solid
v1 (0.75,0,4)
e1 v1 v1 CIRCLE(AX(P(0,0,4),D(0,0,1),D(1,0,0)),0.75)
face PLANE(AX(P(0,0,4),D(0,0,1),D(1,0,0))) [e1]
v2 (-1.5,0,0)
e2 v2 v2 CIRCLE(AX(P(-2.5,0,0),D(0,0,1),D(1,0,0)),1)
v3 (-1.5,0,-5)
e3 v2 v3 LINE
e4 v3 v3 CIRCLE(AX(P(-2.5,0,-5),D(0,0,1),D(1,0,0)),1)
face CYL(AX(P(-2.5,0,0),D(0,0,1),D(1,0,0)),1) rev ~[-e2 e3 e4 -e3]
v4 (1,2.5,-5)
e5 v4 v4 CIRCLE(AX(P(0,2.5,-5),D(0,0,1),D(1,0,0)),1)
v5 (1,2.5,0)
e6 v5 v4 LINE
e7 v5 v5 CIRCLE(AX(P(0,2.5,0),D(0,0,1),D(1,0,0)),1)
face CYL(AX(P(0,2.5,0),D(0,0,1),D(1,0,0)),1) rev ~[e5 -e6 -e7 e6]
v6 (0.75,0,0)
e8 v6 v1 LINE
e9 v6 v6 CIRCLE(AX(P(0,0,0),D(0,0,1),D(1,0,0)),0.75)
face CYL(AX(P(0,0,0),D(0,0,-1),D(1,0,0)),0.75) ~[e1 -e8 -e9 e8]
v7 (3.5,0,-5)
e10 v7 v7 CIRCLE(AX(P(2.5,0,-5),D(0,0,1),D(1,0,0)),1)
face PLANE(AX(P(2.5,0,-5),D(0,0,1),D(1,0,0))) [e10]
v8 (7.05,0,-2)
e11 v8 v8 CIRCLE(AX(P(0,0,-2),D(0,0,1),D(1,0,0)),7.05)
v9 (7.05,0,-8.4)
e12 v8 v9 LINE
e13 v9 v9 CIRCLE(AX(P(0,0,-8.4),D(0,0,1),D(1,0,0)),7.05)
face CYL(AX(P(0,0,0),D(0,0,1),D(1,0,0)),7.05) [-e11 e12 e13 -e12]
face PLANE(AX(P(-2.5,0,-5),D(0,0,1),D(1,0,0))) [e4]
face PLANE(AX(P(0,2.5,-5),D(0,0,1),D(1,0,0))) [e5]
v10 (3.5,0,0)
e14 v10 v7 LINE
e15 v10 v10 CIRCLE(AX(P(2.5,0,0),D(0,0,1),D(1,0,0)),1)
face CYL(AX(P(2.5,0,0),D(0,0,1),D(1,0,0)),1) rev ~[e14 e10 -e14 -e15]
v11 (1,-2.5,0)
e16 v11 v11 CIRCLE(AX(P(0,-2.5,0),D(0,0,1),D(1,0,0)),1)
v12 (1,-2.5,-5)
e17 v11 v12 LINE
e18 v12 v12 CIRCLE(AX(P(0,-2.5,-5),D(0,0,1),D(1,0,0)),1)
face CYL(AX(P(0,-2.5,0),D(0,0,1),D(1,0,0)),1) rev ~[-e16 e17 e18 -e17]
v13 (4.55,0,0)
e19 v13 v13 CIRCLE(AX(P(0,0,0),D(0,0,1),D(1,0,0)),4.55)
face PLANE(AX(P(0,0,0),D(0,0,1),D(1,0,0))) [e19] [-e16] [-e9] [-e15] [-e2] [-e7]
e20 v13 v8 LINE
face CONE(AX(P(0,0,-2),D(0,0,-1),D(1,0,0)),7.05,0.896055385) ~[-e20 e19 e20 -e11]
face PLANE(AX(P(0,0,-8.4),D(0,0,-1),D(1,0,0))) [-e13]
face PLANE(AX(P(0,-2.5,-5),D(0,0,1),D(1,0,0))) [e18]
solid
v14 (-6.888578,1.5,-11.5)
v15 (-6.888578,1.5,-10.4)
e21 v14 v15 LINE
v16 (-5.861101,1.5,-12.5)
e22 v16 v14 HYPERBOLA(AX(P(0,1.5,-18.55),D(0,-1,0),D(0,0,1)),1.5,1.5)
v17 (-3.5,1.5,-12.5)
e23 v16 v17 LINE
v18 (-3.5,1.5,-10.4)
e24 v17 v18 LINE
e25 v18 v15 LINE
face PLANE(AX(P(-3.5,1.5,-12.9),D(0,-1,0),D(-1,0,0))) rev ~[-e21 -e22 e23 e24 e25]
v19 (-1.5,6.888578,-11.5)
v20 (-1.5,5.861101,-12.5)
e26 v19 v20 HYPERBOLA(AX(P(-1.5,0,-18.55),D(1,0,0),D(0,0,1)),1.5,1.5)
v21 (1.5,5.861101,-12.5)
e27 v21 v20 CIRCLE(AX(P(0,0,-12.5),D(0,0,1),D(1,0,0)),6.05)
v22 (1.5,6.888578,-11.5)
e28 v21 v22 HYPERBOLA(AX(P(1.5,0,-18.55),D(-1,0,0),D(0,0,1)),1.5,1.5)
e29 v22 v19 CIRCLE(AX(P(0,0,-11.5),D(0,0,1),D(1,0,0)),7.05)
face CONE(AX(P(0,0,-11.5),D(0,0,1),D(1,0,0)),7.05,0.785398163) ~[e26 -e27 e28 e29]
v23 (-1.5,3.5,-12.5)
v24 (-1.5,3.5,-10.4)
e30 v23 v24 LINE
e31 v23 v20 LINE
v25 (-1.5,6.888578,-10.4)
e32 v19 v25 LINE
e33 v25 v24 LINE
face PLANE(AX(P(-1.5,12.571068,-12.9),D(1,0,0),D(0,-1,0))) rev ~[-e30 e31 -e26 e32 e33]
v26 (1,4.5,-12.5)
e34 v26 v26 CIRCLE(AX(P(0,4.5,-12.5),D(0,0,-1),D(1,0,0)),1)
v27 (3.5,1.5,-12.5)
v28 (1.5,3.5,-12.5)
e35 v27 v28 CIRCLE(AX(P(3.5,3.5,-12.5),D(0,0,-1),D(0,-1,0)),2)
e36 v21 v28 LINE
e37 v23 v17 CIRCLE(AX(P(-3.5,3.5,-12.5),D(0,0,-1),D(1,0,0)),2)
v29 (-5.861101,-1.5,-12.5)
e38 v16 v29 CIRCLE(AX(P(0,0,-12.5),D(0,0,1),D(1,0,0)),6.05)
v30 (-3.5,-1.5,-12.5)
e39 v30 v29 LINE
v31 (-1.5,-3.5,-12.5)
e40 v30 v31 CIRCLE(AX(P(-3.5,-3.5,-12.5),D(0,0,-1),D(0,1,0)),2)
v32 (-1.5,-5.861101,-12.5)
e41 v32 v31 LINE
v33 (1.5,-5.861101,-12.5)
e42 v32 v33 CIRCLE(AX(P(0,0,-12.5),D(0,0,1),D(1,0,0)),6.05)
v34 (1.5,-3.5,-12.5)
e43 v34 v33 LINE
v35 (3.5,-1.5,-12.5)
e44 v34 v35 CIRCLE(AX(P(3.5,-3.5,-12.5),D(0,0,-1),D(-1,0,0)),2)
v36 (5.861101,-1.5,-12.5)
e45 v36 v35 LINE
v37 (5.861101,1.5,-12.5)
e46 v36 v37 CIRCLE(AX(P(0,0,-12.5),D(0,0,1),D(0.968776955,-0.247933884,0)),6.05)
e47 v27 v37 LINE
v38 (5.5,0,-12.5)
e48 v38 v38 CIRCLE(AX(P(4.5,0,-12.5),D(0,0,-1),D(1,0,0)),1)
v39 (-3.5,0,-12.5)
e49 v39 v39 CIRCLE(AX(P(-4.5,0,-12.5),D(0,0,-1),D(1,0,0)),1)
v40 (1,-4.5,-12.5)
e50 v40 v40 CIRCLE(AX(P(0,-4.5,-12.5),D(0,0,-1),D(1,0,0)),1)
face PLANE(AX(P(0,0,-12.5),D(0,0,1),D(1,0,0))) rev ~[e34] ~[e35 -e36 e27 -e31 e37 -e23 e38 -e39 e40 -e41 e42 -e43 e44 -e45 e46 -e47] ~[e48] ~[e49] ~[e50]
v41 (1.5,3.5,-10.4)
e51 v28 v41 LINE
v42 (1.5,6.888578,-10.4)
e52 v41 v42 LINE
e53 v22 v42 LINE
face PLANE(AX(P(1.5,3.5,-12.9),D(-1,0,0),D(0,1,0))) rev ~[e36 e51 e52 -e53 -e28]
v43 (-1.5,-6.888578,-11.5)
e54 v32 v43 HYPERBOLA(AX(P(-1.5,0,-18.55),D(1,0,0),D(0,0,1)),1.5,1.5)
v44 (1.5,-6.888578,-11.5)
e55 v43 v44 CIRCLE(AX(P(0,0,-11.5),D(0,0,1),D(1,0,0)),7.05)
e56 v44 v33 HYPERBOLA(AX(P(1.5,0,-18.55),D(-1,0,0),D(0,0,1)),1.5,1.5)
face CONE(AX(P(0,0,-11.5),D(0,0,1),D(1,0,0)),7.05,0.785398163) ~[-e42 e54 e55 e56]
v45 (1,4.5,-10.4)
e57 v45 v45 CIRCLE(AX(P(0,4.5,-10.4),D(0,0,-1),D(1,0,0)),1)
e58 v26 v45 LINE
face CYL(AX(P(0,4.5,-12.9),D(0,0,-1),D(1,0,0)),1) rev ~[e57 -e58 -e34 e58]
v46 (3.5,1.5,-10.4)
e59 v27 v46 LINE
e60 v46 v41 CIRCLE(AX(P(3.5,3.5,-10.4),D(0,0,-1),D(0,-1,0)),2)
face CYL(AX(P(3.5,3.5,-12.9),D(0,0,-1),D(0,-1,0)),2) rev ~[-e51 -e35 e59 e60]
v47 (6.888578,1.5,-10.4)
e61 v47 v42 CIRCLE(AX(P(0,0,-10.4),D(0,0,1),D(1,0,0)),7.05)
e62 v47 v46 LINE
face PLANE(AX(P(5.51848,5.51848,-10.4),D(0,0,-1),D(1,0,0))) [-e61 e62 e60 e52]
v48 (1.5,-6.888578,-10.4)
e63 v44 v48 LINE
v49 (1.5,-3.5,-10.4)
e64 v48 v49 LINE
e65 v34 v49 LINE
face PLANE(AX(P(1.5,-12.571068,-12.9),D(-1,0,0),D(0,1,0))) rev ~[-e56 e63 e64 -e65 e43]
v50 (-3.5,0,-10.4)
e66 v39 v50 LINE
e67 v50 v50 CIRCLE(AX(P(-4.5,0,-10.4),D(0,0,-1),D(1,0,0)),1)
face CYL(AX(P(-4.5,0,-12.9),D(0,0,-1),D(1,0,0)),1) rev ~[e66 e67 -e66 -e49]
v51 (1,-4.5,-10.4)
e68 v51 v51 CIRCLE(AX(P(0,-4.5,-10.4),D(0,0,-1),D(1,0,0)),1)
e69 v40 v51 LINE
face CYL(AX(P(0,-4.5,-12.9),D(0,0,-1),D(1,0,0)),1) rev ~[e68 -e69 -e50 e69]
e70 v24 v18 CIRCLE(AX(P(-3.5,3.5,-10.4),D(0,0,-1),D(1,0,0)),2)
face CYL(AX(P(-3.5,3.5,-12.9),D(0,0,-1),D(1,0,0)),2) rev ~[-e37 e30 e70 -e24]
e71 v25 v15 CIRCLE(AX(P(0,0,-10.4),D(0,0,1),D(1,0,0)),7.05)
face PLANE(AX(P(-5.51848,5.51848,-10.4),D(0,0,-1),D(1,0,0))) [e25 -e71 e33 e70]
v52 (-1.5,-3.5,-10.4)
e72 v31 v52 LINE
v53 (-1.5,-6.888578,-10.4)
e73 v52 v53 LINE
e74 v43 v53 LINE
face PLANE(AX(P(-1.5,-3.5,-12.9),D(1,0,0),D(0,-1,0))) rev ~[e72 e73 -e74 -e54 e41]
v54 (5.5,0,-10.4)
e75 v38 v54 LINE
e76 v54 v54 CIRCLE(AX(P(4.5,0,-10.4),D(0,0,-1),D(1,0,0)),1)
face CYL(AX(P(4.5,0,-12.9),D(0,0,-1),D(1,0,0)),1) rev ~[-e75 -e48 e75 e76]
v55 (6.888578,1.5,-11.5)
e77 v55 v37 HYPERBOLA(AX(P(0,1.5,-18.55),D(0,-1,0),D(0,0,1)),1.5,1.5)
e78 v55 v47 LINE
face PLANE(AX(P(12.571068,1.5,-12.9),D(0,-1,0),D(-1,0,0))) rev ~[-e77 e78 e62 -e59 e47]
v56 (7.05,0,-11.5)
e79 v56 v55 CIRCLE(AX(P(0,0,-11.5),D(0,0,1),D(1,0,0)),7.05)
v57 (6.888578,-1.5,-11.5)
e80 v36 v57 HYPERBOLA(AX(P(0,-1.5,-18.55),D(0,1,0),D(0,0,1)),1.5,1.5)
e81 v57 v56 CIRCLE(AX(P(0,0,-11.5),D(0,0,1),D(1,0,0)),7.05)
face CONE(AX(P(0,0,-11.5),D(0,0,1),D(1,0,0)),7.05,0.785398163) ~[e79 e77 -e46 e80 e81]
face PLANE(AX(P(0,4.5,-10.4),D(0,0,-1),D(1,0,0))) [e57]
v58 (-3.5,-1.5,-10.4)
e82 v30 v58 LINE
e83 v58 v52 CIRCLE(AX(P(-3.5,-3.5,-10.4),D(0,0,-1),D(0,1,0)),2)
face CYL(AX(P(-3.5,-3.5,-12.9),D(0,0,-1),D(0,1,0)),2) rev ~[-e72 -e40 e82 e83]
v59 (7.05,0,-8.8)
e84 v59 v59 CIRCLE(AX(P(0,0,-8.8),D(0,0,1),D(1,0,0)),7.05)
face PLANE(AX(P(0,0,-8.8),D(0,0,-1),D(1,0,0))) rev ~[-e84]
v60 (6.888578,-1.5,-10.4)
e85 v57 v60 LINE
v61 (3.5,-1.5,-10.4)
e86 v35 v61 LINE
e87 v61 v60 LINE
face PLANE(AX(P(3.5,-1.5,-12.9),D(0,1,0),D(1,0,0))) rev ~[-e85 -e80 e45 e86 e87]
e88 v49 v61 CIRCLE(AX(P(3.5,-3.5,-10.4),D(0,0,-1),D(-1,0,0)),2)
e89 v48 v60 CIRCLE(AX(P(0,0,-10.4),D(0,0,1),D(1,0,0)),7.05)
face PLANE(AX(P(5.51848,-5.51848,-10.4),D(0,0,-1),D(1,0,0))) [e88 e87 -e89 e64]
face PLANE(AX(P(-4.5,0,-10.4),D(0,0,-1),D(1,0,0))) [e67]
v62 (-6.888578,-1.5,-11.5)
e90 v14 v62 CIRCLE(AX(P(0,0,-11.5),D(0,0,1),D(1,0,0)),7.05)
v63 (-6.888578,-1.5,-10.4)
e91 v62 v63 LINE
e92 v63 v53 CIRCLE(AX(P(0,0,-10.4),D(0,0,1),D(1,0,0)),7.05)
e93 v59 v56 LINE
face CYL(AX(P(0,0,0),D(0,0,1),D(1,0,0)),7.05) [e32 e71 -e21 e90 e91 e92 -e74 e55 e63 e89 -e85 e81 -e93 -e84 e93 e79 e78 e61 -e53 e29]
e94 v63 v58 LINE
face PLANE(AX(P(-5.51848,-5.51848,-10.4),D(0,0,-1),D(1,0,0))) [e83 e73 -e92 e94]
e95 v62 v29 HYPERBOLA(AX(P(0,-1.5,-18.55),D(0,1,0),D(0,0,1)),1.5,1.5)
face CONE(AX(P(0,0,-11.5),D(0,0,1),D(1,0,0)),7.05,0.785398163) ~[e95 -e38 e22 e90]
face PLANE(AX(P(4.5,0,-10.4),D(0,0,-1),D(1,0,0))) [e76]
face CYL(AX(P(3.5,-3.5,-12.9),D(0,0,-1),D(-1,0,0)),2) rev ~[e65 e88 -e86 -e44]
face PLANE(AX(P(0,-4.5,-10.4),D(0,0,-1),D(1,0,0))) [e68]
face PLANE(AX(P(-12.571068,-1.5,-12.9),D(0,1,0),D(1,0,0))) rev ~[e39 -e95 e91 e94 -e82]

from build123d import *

# Parameters (mm, degrees)
F0_R      = 7.05
F0_R_2    = 4.5
F0_R_3    = 1
F0_R_4    = 0.75
F1_DEPTH  = 12.5
F2_SIZE2  = 2
F2_SIZE   = 2.5
F3_DEPTH  = 4
F4_DEPTH  = 5
F5_SIZE   = 1
F7_R      = 1
F8_DEPTH  = 2.5
F10_R     = 8.05
F11_DEPTH = 0.4


# Not quite as in the source:
# - a feature names something its author has since deleted; it is built from what else it names


with BuildPart() as f1:
    # F0 (on Top) → F1 (new body)
    with BuildSketch(Plane.XY):
        Circle(F0_R)
        Circle(F0_R_2, mode=Mode.SUBTRACT)
        Circle(F0_R_2)
        with Locations((0, -2.5)):
            Circle(F0_R_3, mode=Mode.SUBTRACT)
        with Locations((-2.5, 0)):
            Circle(F0_R_3, mode=Mode.SUBTRACT)
        Circle(F0_R_4, mode=Mode.SUBTRACT)
        with Locations((2.5, 0)):
            Circle(F0_R_3, mode=Mode.SUBTRACT)
        with Locations((0, 2.5)):
            Circle(F0_R_3, mode=Mode.SUBTRACT)
        with Locations((0, 2.5)):
            Circle(F0_R_3)
        with Locations((2.5, 0)):
            Circle(F0_R_3)
        with Locations((-2.5, 0)):
            Circle(F0_R_3)
        with Locations((0, -2.5)):
            Circle(F0_R_3)
        Circle(F0_R_4)
    extrude(amount=-F1_DEPTH)

    # F2
    f2_edges = [f1.edges().sort_by_distance(p)[0] for p in [
        (-7.05, 0, 0),
    ]]
    f2_side = f1.faces().sort_by_distance((0, 0, 0))[0]
    chamfer(f2_edges, length=F2_SIZE, length2=F2_SIZE2, reference=f2_side)

    # F0 (on Top) → F3 (join)
    with BuildSketch(Plane.XY):
        Circle(F0_R_4)
    extrude(amount=F3_DEPTH)

    # F0 (on Top) → F4 (cut)
    with BuildSketch(Plane.XY):
        with Locations((-2.5, 0)):
            Circle(F0_R_3)
        with Locations((2.5, 0)):
            Circle(F0_R_3)
        with Locations((0, 2.5)):
            Circle(F0_R_3)
        with Locations((0, -2.5)):
            Circle(F0_R_3)
    extrude(amount=-F4_DEPTH, mode=Mode.SUBTRACT)

    # F5
    f5_edges = [f1.edges().sort_by_distance(p)[0] for p in [
        (-7.05, 0, -12.5),
    ]]
    chamfer(f5_edges, length=F5_SIZE)

    # F7 (on offset) → F8 (cut)
    with BuildSketch(Plane(origin=(0, 0, -12.9), x_dir=(1, 0, 0), z_dir=(0, 0, -1))):
        with Locations((4.5, 0)):
            Circle(F7_R)
        with Locations((0, 4.5)):
            Circle(F7_R)
        with Locations((-4.5, 0)):
            Circle(F7_R)
        with Locations((0, -4.5)):
            Circle(F7_R)
        with BuildLine():
            Line((12.5710678119, -1.5), (3.5, -1.5))
            ThreePointArc((3.5, -1.5), (2.0857864376, -2.0857864376), (1.5, -3.5))
            Line((1.5, -3.5), (1.5, -12.5710678119))
            Line((1.5, -12.5710678119), (12.5710678119, -1.5))
        make_face()
        with BuildLine():
            Line((12.5710678119, 1.5), (1.5, 12.5710678119))
            Line((1.5, 12.5710678119), (1.5, 3.5))
            ThreePointArc((1.5, 3.5), (2.0857864376, 2.0857864376), (3.5, 1.5))
            Line((3.5, 1.5), (12.5710678119, 1.5))
        make_face()
        with BuildLine():
            Line((-1.5, 12.5710678119), (-12.5710678119, 1.5))
            Line((-12.5710678119, 1.5), (-3.5, 1.5))
            ThreePointArc((-3.5, 1.5), (-2.0857864376, 2.0857864376), (-1.5, 3.5))
            Line((-1.5, 3.5), (-1.5, 12.5710678119))
        make_face()
        with BuildLine():
            Line((-12.5710678119, -1.5), (-1.5, -12.5710678119))
            Line((-1.5, -12.5710678119), (-1.5, -3.5))
            ThreePointArc((-1.5, -3.5), (-2.0857864376, -2.0857864376), (-3.5, -1.5))
            Line((-3.5, -1.5), (-12.5710678119, -1.5))
        make_face()
    extrude(amount=-F8_DEPTH, mode=Mode.SUBTRACT)

    # F10 (on offset) → F11 (cut)
    with BuildSketch(Plane(origin=(0, 0, -8.8), x_dir=(1, 0, 0), z_dir=(0, 0, -1))):
        Circle(F10_R)
    extrude(amount=-F11_DEPTH, mode=Mode.SUBTRACT)


solid = f1.part
